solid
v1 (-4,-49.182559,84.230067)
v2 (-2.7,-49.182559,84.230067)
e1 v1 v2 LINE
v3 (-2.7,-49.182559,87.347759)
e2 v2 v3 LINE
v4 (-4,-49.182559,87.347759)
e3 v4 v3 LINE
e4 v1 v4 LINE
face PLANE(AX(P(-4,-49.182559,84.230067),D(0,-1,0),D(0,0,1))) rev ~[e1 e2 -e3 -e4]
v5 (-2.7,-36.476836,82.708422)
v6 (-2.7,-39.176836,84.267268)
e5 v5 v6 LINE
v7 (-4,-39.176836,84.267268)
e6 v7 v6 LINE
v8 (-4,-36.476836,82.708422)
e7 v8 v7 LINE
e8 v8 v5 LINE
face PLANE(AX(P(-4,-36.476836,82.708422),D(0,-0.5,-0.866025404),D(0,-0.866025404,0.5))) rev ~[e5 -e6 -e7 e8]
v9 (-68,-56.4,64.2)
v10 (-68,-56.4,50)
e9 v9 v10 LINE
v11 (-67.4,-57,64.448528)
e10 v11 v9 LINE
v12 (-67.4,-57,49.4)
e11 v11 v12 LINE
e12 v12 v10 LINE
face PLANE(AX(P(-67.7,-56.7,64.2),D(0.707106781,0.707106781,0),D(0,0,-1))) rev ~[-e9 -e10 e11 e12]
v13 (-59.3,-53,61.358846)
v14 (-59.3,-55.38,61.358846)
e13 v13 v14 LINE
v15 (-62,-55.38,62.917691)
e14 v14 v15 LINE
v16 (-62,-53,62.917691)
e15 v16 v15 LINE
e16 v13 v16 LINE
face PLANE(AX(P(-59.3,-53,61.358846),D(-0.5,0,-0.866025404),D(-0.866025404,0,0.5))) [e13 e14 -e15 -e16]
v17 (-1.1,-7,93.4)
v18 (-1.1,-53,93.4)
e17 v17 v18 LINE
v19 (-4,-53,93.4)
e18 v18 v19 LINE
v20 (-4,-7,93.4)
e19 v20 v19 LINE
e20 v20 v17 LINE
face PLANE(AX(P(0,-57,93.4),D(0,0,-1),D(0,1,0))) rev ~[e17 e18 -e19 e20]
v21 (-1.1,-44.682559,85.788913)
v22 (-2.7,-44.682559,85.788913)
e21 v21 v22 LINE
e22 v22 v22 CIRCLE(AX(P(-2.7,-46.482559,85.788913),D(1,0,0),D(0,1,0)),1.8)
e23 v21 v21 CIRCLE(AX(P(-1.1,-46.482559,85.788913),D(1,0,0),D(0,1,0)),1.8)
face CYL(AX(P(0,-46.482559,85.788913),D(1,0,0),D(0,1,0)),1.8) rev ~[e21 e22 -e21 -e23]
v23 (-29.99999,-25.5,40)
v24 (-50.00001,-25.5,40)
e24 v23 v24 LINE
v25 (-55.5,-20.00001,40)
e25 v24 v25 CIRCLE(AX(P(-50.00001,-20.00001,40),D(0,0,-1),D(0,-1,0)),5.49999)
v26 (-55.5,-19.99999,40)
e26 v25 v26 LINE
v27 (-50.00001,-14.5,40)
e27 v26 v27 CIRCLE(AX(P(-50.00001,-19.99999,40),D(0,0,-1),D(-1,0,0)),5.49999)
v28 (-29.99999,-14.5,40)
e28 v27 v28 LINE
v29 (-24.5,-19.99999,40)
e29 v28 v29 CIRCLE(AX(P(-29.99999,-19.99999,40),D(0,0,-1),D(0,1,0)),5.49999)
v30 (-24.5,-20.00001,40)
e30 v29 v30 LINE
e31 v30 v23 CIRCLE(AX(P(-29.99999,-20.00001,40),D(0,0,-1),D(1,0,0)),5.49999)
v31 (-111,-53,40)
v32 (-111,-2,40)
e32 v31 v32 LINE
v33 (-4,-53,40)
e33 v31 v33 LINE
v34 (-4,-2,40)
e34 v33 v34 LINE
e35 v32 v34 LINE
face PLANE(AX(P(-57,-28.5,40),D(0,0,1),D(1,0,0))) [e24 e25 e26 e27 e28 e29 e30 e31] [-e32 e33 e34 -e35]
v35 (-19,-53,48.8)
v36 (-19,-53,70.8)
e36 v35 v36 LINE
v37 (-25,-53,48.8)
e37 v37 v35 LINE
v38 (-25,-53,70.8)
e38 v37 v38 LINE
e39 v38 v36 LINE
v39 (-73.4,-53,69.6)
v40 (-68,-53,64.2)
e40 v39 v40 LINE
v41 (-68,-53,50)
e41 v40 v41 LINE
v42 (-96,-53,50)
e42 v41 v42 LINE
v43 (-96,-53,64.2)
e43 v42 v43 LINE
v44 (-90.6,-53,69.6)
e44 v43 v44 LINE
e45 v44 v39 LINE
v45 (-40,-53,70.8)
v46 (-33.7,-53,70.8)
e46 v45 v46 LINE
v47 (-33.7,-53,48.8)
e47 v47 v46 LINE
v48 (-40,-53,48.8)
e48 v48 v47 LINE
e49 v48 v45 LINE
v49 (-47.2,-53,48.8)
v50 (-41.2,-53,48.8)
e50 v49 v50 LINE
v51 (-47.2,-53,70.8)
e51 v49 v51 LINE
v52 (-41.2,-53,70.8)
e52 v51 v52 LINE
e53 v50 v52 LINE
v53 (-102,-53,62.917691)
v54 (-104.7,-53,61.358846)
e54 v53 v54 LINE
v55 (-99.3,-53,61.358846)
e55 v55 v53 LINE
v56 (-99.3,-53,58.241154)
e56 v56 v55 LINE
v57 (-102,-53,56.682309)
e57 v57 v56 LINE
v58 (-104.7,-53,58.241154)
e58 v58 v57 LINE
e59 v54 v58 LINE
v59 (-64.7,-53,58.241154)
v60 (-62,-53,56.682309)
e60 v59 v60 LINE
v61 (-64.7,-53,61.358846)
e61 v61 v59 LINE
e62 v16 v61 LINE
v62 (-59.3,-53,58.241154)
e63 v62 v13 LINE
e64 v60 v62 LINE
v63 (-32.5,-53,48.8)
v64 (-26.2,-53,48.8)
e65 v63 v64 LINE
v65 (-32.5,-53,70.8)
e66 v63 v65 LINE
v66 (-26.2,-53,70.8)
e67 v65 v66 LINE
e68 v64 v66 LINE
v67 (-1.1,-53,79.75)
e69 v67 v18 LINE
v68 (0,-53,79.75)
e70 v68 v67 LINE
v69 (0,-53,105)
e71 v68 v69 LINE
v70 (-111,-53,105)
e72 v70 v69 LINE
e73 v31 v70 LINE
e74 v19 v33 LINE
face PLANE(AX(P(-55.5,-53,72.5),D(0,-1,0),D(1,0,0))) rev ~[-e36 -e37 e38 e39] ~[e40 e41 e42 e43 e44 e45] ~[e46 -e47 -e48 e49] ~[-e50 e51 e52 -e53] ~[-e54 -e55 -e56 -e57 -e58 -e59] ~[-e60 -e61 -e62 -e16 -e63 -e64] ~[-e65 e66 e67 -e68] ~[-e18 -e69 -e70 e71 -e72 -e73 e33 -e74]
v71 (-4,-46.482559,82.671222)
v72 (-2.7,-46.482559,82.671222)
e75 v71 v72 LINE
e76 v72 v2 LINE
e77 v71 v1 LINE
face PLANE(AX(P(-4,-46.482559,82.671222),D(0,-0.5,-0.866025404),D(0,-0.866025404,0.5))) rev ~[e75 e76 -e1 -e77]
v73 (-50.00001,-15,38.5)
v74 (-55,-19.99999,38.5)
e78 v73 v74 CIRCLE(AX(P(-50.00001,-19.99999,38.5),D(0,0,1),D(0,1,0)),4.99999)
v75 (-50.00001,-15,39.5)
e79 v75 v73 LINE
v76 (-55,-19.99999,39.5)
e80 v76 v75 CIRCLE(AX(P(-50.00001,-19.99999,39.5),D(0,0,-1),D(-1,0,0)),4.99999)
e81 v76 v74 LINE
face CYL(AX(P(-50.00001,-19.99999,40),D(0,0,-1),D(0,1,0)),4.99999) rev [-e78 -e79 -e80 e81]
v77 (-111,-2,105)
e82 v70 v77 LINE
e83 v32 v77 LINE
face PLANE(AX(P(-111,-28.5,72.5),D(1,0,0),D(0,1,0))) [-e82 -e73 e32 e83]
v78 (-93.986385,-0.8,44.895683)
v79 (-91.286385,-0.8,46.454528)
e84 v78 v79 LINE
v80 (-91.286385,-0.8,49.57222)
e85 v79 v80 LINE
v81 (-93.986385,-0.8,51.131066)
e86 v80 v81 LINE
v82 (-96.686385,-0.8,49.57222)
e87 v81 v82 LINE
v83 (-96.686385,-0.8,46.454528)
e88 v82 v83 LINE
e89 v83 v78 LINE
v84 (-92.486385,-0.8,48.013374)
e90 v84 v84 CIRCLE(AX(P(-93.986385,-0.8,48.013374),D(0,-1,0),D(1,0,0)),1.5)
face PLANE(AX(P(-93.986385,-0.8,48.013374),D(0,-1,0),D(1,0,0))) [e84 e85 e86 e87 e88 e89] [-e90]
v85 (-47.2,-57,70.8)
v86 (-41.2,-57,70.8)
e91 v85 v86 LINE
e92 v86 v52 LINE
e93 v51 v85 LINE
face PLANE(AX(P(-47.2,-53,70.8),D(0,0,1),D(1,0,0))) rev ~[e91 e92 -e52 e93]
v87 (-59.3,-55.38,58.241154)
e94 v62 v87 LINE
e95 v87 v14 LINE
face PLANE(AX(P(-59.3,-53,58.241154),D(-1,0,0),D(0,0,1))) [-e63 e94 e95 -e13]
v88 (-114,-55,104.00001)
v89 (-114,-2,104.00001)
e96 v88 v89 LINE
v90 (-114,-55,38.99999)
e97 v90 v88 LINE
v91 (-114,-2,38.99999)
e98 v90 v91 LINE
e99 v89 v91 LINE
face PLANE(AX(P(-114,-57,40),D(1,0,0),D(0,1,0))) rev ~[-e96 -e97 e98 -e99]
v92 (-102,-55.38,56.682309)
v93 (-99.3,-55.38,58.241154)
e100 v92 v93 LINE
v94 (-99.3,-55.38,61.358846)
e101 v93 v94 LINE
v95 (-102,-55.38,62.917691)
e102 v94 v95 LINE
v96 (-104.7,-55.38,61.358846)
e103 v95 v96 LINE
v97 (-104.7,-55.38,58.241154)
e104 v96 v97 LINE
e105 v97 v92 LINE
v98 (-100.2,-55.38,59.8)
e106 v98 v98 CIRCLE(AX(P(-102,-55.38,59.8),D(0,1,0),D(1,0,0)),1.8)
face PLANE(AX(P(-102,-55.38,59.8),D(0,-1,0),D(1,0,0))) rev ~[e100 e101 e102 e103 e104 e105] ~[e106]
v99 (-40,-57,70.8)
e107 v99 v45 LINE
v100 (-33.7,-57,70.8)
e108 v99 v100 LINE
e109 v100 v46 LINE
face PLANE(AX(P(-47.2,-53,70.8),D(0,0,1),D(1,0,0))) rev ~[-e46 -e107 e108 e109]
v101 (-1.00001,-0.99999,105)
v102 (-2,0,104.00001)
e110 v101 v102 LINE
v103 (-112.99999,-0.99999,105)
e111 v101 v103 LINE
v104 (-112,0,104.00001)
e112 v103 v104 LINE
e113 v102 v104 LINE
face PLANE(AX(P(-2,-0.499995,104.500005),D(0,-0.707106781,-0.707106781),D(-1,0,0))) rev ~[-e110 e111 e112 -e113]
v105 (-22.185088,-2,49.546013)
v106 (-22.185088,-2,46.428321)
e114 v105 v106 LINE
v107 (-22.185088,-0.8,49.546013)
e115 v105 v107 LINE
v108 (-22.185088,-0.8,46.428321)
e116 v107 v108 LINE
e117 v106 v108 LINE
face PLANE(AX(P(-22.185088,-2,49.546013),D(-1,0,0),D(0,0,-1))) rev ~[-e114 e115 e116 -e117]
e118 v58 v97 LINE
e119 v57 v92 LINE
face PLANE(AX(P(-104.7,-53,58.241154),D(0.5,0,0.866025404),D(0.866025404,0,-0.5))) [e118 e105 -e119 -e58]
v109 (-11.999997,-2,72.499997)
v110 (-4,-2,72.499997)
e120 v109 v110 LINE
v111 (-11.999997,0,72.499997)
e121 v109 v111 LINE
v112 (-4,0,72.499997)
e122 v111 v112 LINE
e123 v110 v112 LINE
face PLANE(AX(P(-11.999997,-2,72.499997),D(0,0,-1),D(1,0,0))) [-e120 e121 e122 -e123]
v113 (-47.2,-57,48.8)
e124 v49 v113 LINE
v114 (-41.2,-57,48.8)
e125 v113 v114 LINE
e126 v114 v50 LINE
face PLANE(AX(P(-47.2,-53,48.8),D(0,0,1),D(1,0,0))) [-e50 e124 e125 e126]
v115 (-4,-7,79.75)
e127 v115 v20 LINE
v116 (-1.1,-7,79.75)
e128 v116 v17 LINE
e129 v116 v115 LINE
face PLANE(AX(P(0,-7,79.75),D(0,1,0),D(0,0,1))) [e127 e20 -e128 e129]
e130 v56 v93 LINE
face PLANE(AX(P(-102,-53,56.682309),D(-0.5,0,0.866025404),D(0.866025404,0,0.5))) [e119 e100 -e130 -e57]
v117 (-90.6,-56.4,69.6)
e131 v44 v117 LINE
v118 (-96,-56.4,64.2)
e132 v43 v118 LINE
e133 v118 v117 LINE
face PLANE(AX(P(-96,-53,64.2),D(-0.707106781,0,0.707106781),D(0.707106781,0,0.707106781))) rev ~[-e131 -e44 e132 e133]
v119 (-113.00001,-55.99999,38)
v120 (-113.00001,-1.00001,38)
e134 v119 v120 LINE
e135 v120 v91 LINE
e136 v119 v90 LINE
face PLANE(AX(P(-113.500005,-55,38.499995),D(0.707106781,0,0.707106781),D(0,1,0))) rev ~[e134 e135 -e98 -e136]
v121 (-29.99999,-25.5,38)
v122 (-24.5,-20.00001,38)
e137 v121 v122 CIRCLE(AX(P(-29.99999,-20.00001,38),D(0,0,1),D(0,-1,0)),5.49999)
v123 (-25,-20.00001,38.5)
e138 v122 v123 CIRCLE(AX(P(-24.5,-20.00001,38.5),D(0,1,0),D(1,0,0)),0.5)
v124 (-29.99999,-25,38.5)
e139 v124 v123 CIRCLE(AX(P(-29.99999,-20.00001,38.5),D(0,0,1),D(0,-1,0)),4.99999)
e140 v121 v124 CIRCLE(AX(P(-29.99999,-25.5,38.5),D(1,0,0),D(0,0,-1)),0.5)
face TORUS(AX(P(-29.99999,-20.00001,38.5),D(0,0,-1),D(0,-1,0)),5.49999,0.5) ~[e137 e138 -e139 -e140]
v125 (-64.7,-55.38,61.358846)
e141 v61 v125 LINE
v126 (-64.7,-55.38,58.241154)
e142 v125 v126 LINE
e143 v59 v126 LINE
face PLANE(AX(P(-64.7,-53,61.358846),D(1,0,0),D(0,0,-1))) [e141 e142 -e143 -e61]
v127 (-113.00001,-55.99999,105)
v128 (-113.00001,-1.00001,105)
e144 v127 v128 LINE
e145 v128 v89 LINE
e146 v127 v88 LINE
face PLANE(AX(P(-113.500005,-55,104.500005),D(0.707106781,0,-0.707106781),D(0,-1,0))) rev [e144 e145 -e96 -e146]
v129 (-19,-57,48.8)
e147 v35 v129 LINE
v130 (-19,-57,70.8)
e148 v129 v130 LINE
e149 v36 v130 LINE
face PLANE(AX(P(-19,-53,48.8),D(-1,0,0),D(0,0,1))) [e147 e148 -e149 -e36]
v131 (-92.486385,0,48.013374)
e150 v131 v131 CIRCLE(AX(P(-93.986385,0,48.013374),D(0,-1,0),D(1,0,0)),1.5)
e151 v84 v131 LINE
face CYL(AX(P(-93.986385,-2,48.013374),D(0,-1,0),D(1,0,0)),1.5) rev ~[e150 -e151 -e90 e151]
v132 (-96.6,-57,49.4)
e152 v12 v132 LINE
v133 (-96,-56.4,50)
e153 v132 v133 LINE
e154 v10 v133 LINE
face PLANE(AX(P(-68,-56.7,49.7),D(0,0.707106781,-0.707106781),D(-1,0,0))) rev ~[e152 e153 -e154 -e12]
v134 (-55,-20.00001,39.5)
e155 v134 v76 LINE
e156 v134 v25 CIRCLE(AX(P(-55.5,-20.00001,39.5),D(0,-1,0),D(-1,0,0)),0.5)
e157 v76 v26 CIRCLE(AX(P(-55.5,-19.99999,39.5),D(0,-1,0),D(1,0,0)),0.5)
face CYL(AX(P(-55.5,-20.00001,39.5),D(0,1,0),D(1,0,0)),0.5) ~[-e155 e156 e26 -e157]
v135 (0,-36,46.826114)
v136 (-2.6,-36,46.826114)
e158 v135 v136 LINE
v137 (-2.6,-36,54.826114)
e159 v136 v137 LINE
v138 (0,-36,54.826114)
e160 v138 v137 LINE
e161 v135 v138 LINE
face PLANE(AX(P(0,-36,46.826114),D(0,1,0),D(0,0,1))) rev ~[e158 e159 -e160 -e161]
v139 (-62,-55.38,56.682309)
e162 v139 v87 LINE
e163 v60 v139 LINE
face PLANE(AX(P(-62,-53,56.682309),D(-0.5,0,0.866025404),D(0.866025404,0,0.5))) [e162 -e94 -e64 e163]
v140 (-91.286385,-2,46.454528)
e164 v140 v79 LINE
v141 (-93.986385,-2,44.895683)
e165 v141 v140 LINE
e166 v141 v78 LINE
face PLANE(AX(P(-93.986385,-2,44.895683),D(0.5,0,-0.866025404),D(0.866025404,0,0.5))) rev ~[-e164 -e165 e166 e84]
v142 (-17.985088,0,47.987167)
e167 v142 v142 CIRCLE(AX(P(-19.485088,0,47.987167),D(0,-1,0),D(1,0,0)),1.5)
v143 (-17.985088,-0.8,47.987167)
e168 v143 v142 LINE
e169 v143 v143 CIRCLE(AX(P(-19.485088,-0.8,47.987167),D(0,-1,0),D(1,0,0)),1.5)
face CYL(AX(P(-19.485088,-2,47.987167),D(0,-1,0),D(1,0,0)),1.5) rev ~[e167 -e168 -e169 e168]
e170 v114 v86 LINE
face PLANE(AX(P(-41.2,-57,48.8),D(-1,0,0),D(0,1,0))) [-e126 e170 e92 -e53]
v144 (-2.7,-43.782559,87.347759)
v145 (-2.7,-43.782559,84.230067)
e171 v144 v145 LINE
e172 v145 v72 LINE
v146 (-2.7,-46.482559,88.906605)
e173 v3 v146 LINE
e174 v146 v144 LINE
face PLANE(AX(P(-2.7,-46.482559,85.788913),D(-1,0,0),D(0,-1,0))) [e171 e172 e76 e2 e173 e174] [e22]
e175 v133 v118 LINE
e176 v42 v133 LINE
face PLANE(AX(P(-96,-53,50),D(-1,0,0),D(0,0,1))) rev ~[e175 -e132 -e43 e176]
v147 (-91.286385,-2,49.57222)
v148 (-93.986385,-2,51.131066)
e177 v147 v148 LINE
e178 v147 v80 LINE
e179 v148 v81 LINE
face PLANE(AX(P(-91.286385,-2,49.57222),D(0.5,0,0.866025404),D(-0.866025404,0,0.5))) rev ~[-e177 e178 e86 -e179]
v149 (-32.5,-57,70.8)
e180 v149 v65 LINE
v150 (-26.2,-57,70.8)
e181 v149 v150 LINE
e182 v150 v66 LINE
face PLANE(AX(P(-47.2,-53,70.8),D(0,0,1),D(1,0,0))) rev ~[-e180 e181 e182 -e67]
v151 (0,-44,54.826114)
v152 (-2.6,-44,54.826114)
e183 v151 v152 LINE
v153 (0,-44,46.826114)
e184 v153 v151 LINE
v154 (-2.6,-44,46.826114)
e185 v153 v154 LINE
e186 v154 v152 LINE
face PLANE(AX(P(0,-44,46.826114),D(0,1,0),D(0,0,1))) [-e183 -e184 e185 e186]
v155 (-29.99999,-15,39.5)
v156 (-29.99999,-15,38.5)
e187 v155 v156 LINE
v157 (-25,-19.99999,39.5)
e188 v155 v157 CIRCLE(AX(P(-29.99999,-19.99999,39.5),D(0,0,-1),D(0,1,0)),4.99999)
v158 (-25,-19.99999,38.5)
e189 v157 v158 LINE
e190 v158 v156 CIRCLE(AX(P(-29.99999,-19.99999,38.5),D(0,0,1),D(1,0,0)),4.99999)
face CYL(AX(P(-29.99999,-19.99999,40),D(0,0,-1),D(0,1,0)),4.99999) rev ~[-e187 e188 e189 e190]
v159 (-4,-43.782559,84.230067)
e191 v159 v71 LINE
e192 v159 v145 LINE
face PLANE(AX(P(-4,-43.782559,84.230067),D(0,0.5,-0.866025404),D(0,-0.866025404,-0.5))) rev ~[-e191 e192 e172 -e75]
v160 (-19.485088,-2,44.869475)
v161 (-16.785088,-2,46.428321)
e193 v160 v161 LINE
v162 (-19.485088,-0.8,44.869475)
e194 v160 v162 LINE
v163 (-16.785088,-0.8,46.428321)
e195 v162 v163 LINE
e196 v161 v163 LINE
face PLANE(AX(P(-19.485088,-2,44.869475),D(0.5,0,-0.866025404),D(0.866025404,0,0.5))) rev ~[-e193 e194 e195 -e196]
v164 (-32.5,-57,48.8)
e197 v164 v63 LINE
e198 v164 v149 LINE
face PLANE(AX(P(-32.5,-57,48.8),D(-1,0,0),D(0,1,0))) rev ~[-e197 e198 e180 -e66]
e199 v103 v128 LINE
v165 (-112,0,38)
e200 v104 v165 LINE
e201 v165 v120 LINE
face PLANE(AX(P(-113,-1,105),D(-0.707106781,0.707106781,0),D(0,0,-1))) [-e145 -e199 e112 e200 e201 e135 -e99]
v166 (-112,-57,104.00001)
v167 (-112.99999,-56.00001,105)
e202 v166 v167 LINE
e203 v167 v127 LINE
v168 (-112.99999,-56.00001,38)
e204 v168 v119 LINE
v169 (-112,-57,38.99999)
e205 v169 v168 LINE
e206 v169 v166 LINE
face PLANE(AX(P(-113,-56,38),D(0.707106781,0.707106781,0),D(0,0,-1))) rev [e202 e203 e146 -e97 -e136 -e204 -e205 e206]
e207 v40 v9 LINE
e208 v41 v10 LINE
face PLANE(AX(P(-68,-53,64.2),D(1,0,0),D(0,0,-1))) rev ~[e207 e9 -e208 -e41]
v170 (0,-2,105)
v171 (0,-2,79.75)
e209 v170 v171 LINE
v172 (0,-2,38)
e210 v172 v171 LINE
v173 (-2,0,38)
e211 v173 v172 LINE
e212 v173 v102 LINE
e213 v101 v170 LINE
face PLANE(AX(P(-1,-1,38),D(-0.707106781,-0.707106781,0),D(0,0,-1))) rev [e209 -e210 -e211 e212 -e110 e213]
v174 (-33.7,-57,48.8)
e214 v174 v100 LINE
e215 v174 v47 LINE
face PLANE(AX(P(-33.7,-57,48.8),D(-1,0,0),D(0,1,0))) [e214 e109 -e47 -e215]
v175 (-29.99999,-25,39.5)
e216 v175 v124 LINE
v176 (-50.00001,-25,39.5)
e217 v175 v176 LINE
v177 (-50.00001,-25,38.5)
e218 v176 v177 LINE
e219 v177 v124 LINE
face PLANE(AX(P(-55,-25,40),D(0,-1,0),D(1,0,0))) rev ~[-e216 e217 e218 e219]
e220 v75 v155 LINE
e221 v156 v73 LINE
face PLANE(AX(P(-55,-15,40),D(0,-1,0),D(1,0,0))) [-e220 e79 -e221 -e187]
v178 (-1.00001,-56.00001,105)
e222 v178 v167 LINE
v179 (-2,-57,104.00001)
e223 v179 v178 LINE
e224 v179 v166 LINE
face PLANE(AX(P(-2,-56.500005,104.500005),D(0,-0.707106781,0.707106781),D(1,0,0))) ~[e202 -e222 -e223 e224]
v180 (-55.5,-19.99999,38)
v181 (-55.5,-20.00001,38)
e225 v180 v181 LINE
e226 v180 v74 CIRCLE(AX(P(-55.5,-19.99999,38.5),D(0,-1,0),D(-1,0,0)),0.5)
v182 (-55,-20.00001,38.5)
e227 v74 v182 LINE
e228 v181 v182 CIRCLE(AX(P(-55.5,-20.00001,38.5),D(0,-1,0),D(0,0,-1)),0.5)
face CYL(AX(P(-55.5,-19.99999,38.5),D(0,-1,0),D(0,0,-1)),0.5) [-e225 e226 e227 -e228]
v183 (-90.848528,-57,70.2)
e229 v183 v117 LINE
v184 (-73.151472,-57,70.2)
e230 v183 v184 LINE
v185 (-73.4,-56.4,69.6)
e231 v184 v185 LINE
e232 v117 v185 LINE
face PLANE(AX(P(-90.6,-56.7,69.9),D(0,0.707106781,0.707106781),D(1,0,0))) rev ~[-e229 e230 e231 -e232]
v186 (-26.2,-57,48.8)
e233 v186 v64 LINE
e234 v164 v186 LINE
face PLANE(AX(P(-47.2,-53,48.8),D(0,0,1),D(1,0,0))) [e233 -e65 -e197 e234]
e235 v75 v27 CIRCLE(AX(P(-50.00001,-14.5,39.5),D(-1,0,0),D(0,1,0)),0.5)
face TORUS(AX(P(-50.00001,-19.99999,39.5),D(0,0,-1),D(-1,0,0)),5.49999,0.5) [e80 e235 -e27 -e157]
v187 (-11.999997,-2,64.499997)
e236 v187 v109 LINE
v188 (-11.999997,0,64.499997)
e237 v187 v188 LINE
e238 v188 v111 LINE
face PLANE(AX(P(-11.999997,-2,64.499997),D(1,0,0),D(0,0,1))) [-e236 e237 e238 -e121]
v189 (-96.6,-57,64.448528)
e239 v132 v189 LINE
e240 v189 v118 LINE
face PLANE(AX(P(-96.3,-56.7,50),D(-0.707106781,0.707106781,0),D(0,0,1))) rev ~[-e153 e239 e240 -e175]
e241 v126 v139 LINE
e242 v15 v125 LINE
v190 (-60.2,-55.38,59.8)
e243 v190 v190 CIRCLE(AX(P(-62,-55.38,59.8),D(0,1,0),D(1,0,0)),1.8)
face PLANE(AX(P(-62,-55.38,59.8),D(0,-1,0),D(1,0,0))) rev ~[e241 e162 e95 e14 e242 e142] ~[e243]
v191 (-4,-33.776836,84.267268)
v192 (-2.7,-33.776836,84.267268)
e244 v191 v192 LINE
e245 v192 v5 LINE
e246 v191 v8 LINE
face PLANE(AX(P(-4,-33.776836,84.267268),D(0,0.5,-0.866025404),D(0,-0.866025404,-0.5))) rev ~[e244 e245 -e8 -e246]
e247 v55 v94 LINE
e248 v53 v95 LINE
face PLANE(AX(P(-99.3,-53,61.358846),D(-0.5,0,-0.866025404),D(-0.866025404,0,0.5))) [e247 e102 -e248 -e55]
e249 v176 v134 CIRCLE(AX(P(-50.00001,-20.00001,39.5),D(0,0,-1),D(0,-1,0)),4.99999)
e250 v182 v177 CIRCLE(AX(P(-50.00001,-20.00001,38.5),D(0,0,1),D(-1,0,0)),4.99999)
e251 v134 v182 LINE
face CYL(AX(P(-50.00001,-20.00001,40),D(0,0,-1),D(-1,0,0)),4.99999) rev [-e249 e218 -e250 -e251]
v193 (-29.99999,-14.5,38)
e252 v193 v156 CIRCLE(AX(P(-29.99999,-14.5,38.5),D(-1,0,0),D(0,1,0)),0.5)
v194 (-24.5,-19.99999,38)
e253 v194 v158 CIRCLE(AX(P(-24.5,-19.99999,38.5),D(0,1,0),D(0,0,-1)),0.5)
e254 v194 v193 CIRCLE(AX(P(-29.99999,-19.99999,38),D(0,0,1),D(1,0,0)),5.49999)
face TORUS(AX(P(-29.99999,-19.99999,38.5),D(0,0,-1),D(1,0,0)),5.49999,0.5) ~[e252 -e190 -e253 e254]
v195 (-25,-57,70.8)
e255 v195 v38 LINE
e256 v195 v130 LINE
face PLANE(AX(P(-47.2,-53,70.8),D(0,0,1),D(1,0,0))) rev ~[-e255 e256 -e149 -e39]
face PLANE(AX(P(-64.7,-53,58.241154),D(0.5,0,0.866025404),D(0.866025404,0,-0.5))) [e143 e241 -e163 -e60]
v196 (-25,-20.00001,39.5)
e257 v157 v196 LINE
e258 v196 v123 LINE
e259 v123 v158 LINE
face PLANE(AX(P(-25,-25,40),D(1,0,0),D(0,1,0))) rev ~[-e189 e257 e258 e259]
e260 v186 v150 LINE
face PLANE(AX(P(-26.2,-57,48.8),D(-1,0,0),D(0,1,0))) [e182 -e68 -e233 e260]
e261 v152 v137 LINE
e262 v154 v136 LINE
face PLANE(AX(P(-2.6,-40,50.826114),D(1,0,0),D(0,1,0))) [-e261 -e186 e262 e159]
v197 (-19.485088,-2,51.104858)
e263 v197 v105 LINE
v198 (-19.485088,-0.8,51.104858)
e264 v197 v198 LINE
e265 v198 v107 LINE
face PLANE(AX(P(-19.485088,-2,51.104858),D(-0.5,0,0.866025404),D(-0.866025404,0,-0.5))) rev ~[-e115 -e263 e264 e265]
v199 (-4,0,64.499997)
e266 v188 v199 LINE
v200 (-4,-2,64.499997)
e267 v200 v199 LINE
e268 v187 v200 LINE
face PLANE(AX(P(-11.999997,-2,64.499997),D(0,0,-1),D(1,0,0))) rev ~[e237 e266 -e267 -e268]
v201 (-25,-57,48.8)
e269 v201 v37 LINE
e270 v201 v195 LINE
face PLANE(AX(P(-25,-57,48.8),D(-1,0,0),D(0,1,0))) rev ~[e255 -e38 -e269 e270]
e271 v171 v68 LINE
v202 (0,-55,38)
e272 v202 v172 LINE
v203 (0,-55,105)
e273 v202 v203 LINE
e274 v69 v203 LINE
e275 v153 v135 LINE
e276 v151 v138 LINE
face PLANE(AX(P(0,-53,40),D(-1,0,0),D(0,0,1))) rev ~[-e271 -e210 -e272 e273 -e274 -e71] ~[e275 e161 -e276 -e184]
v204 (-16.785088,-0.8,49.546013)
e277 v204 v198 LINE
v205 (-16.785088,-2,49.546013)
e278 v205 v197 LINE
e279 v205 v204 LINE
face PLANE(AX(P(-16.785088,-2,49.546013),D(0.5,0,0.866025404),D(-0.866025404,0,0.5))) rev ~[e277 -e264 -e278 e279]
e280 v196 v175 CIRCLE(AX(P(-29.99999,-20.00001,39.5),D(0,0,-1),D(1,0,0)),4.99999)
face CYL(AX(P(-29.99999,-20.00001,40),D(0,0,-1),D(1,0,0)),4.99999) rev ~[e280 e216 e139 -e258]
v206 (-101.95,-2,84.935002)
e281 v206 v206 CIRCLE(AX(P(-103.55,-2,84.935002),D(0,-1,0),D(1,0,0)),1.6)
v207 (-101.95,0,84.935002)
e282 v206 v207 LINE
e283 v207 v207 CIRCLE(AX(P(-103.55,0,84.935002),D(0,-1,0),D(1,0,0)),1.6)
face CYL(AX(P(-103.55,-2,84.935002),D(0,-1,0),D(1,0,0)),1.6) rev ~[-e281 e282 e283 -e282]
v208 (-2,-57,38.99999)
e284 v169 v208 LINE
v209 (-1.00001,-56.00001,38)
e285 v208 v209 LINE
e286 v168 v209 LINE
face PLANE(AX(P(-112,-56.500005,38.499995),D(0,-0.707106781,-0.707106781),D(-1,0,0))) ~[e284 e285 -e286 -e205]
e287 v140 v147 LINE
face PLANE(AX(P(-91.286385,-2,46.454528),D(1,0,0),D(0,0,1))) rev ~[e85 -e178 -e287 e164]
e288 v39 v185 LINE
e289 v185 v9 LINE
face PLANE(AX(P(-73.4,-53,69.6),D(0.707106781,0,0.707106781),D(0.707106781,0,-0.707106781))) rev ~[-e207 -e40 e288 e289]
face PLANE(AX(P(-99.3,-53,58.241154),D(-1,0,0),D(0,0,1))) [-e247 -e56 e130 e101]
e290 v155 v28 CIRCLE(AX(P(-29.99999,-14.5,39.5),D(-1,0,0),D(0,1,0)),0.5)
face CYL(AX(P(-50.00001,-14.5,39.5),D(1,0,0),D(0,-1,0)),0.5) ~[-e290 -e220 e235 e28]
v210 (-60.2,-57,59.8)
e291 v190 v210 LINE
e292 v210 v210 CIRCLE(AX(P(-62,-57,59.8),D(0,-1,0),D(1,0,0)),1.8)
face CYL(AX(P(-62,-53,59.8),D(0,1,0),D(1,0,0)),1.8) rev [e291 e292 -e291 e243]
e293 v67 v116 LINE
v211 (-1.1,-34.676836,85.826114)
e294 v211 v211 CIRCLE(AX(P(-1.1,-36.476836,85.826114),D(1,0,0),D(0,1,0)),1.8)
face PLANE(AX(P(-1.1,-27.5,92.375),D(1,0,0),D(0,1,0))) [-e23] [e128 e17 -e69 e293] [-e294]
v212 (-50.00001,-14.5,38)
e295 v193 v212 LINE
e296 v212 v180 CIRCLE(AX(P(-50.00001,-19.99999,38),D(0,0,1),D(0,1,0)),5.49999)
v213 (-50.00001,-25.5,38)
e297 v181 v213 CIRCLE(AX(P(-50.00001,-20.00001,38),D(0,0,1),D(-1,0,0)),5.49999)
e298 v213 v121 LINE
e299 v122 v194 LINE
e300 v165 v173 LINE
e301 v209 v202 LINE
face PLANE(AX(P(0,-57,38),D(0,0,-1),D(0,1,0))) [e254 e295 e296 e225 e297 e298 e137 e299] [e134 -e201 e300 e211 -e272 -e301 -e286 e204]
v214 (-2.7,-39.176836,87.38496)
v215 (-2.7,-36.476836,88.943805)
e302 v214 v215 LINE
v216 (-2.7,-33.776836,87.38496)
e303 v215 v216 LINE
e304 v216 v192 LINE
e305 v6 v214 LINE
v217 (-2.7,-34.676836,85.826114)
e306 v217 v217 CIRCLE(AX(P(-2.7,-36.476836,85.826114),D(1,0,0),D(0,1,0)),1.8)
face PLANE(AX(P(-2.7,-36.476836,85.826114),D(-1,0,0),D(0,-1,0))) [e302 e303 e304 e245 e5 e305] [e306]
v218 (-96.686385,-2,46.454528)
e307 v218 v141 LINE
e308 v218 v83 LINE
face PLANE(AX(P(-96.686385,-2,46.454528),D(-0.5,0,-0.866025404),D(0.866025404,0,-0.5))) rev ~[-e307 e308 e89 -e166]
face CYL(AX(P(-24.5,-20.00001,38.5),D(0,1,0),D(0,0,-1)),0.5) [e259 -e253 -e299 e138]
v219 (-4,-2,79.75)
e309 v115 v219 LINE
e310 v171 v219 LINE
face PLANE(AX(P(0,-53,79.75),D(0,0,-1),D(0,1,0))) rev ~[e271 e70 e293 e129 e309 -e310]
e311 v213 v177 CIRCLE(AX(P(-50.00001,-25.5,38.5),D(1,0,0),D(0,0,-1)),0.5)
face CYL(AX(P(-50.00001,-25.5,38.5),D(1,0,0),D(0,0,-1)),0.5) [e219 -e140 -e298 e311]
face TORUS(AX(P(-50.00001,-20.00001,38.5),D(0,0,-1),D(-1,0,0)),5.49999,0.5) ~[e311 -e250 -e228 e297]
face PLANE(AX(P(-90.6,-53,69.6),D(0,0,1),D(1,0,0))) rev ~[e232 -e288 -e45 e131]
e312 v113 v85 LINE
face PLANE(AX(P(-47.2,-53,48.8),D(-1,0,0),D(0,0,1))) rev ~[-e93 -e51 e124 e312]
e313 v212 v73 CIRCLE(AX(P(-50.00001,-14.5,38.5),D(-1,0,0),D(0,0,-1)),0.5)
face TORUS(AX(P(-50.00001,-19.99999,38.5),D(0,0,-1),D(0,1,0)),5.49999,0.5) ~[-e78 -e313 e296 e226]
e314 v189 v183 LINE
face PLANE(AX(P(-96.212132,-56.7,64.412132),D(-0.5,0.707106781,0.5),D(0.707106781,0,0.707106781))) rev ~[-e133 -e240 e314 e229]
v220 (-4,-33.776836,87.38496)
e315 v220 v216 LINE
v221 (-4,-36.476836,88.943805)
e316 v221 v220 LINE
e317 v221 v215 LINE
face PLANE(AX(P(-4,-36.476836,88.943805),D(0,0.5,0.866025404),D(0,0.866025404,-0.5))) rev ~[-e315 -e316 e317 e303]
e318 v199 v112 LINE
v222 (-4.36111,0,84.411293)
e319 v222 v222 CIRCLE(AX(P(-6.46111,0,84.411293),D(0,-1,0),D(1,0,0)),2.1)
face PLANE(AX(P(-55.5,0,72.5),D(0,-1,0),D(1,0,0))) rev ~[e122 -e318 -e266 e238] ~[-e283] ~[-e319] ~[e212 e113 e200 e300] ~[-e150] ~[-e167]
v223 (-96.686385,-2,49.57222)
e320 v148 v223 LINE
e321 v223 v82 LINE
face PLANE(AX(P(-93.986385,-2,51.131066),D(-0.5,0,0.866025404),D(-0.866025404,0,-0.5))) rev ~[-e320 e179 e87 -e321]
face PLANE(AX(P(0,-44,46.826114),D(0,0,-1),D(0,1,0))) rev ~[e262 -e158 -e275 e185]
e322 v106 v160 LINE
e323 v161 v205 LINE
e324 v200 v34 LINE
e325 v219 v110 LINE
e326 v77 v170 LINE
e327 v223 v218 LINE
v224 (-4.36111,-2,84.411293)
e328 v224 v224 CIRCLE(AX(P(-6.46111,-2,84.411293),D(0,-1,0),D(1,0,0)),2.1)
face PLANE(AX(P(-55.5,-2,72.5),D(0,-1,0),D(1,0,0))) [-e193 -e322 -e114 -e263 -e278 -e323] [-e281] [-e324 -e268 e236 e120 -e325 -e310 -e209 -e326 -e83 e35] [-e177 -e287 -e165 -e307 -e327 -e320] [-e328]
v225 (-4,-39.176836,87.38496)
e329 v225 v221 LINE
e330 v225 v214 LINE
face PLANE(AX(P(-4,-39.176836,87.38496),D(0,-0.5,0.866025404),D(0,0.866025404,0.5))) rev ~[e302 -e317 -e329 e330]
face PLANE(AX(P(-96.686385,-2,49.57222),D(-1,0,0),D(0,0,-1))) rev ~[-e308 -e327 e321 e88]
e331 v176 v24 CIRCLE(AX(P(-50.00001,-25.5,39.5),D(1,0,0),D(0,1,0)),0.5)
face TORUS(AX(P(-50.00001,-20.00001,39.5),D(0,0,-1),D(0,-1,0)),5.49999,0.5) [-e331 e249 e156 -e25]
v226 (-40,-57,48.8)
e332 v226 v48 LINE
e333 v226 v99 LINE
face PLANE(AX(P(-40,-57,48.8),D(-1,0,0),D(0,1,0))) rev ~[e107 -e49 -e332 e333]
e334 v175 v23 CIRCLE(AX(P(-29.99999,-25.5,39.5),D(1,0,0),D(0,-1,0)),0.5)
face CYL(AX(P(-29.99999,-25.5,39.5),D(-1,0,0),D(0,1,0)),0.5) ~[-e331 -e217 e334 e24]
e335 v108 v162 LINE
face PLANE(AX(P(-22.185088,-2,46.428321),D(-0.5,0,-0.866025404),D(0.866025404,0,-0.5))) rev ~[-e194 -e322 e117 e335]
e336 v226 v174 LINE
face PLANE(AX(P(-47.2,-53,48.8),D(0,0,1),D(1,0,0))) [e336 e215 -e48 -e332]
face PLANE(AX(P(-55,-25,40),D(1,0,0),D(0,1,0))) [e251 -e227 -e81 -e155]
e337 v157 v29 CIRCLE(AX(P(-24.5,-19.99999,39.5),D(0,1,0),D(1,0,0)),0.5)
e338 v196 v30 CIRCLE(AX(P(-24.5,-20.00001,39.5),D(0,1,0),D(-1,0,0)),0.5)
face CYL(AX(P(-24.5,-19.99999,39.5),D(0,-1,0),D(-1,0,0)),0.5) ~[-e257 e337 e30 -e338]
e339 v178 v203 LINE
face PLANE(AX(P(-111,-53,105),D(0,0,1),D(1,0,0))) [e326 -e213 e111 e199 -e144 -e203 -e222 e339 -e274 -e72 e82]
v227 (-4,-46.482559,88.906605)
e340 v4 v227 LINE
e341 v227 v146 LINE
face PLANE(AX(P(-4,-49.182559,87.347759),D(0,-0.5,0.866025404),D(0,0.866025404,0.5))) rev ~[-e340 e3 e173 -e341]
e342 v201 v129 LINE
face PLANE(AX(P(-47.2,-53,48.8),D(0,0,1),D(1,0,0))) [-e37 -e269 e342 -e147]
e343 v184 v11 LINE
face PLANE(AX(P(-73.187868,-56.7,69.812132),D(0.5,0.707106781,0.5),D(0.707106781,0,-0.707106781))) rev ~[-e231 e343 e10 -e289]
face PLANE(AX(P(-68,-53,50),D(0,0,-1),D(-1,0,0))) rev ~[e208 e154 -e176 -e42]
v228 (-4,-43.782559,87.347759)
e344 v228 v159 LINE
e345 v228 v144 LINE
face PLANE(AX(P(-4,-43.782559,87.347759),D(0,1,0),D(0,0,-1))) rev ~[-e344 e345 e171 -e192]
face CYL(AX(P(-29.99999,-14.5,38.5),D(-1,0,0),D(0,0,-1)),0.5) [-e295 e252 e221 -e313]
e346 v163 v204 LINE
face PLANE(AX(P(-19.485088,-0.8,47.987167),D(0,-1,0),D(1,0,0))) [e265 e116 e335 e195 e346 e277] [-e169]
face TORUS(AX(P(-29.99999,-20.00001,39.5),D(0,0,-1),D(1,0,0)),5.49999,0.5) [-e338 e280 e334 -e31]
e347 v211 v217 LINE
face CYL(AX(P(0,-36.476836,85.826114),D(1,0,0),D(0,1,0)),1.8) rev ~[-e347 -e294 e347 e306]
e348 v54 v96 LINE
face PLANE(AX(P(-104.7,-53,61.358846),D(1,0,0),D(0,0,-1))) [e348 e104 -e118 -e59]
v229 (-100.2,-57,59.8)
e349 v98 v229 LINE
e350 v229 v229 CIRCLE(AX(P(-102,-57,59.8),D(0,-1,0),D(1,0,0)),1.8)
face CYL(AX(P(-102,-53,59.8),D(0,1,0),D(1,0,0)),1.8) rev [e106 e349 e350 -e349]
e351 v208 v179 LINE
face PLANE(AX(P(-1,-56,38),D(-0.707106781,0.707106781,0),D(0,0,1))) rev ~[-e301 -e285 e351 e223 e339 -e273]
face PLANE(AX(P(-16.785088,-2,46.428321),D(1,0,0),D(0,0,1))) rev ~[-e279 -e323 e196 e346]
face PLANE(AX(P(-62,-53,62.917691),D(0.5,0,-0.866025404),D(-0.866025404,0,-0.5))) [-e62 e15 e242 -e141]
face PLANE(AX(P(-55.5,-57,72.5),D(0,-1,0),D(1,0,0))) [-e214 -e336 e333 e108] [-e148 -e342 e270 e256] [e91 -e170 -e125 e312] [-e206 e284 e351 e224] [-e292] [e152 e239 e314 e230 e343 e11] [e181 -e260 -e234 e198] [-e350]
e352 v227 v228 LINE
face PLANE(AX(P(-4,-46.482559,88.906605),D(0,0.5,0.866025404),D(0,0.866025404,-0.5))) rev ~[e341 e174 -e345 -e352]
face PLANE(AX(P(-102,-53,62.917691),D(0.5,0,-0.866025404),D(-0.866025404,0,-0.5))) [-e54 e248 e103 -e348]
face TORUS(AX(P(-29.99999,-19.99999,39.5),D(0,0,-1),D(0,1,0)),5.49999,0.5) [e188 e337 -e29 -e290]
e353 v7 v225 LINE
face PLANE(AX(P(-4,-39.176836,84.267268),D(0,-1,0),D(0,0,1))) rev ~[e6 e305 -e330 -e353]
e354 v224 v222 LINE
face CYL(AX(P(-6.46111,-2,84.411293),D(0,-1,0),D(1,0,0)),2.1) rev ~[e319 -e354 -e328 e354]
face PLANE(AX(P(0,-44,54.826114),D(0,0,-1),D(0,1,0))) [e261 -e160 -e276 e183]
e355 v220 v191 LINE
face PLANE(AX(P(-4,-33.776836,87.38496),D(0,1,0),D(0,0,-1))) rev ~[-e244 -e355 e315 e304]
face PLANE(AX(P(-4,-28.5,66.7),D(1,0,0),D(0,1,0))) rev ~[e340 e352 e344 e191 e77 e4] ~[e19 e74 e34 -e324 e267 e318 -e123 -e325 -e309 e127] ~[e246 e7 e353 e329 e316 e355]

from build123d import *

# Parameters (mm, degrees)
F7_W      = 57
F7_H      = 65
F8_DEPTH  = 3
F6_W      = 114
F6_H      = 57
F6_W_2    = 30
F6_H_2    = 10
F9_DEPTH  = 2
F10_R     = 4.99999
F5_W      = 57
F5_H      = 53.4
F5_R      = 1.8
F11_DEPTH = 4
F12_W     = 51
F12_H     = 25.25
F13_DEPTH = 1.1
F14_DEPTH = 4
F15_W     = 5
F15_H     = 25.25
F16_DEPTH = 4.1
F1_W      = 111
F1_H      = 65
F1_R      = 1.5
F1_W_2    = 8
F1_H_2    = 8
F1_R_2    = 1.6
F1_R_3    = 2.1
F17_DEPTH = 2
F19_SIZE  = 2
F20_SIZE  = 2
F18_W     = 111
F18_H     = 65
F18_R     = 1.8
F18_W_2   = 28.2
F18_H_2   = 22
F21_DEPTH = 4
F22_SIZE  = 2
F23_SIZE  = 2
F24_SIZE  = 0.99999
F25_SIZE  = 0.99999
F26_R     = 0.5
F27_W     = 1.2
F27_H     = 4
F28_DEPTH = 22
F29_SIZE  = 0.6
F31_DEPTH = 1.3
F33_DEPTH = 2.38
F35_DEPTH = 1.2
F36_W     = 8
F36_H     = 8
F37_DEPTH = 2.6


# Not quite as in the source:
# - a fillet or chamfer is up to 0.001 mm smaller than in the source, because OpenCascade refuses the exact size


with BuildPart() as f8:
    # F7 (on offset) → F8 (new body)
    with BuildSketch(Plane.YZ.offset(-111)):
        with Locations((-28.5, 72.5)):
            Rectangle(F7_W, F7_H)
    extrude(amount=-F8_DEPTH)

    # F6 (on offset) → F9 (join)
    with BuildSketch(Plane.XY.offset(40)):
        with Locations((-57, -28.5)):
            Rectangle(F6_W, F6_H)
        with Locations((-40, -20)):
            Rectangle(F6_W_2, F6_H_2, mode=Mode.SUBTRACT)
    extrude(amount=-F9_DEPTH)

    # F10 (radius 5 in the source; OpenCascade refuses exactly that, so slightly less here)
    f10_edges = [f8.edges().sort_by_distance(p)[0] for p in [
        (-25, -25, 39),
        (-55, -25, 39),
        (-55, -15, 39),
        (-25, -15, 39),
    ]]
    fillet(f10_edges, radius=F10_R)

    # F5 (on Right) → F11 (join)
    with BuildSketch(Plane.YZ):
        with Locations((-28.5, 66.7)):
            Rectangle(F5_W, F5_H)
        with Locations((-46.4825592935, 85.7889130712)):
            Circle(F5_R, mode=Mode.SUBTRACT)
        with Locations((-36.4768356085, 85.8261138201)):
            Circle(F5_R, mode=Mode.SUBTRACT)
    extrude(amount=-F11_DEPTH)

    # F12 (on face) → F13 (cut)
    with BuildSketch(Plane.YZ):
        with Locations((-27.5, 92.375)):
            Rectangle(F12_W, F12_H)
    extrude(amount=-F13_DEPTH, mode=Mode.SUBTRACT)

    # F14 (add): a face of the model
    f14_faces = [f8.faces().sort_by_distance(p)[0] for p in [
        (0, -28.7827981232, 59.796589178),
    ]]
    extrude(f14_faces, amount=-F14_DEPTH)

    # F15 (on face) → F16 (cut)
    with BuildSketch(Plane.YZ):
        with Locations((-4.5, 92.375)):
            Rectangle(F15_W, F15_H)
    extrude(amount=-F16_DEPTH, mode=Mode.SUBTRACT)

    # F1 (on offset) → F17 (join)
    with BuildSketch(Plane.XZ.offset(2)):
        with Locations((-55.5, 72.5)):
            Rectangle(F1_W, F1_H)
        with Locations((-93.9863845706, 48.0133742094)):
            Circle(F1_R, mode=Mode.SUBTRACT)
        with Locations((-19.4850880653, 47.9871667922)):
            Circle(F1_R, mode=Mode.SUBTRACT)
        with Locations((-7.9999973103, 68.4999966025)):
            Rectangle(F1_W_2, F1_H_2, mode=Mode.SUBTRACT)
        with Locations((-103.55, 84.9350020289)):
            Circle(F1_R_2, mode=Mode.SUBTRACT)
        with Locations((-6.4611095004, 84.4112932682)):
            Circle(F1_R_3, mode=Mode.SUBTRACT)
    extrude(amount=-F17_DEPTH)

    # F19
    f19_edges = [f8.edges().sort_by_distance(p)[0] for p in [
        (0, 0, 71.5),
    ]]
    chamfer(f19_edges, length=F19_SIZE)

    # F20
    f20_edges = [f8.edges().sort_by_distance(p)[0] for p in [
        (-114, 0, 71.5),
    ]]
    chamfer(f20_edges, length=F20_SIZE)

    # F18 (on offset) → F21 (join)
    with BuildSketch(Plane.XZ.offset(53)):
        with Locations((-55.5, 72.5)):
            Rectangle(F18_W, F18_H)
        with Locations((-102, 59.8)):
            Circle(F18_R, mode=Mode.SUBTRACT)
        Polygon((-96, 64.2), (-90.6, 69.6), (-73.4, 69.6), (-68, 64.2), (-68, 50), (-96, 50), align=None, mode=Mode.SUBTRACT)
        with Locations((-62, 59.8)):
            Circle(F18_R, mode=Mode.SUBTRACT)
        with Locations((-33.1, 59.8)):
            Rectangle(F18_W_2, F18_H_2, mode=Mode.SUBTRACT)
    extrude(amount=F21_DEPTH)

    # F22
    f22_edges = [f8.edges().sort_by_distance(p)[0] for p in [
        (0, -57, 71.5),
    ]]
    chamfer(f22_edges, length=F22_SIZE)

    # F23
    f23_edges = [f8.edges().sort_by_distance(p)[0] for p in [
        (-114, -57, 71.5),
    ]]
    chamfer(f23_edges, length=F23_SIZE)

    # F24 (size 1 in the source; OpenCascade refuses exactly that, so slightly less here)
    f24_edges = [f8.edges().sort_by_distance(p)[0] for p in [
        (-57, -57, 105),
        (-57, 0, 105),
        (-114, -28.5, 105),
    ]]
    chamfer(f24_edges, length=F24_SIZE)

    # F25 (size 1 in the source; OpenCascade refuses exactly that, so slightly less here)
    f25_edges = [f8.edges().sort_by_distance(p)[0] for p in [
        (-57, -57, 38),
        (-114, -28.5, 38),
    ]]
    chamfer(f25_edges, length=F25_SIZE)

    # F26
    f26_edges = [f8.edges().sort_by_distance(p)[0] for p in [
        (-40, -25, 38),
        (-53.535537, -23.535537, 38),
        (-40, -15, 38),
        (-26.464463, -16.464463, 38),
        (-26.464463, -16.464463, 40),
        (-53.535537, -23.535537, 40),
    ]]
    fillet(f26_edges, radius=F26_R)

    # F27 (on face) → F28 (join, through all)
    with BuildSketch(Plane.XY.offset(48.8)):
        with Locations((-33.1, -55)):
            Rectangle(F27_W, F27_H)
        with Locations((-40.6, -55)):
            Rectangle(F27_W, F27_H)
        with Locations((-25.6, -55)):
            Rectangle(F27_W, F27_H)
    extrude(amount=F28_DEPTH)

    # F29
    f29_edges = [f8.edges().sort_by_distance(p)[0] for p in [
        (-82, -57, 50),
        (-68, -57, 57.1),
        (-70.7, -57, 66.9),
        (-82, -57, 69.6),
        (-93.3, -57, 66.9),
        (-96, -57, 57.1),
    ]]
    chamfer(f29_edges, length=F29_SIZE)

    # F30 (on face) → F31 (cut)
    with BuildSketch(Plane(origin=(-4, 0, 0), x_dir=(0, -1, 0), z_dir=(-1, 0, 0))):
        Polygon((39.1768356085, 84.2672680933), (39.1768356085, 87.3849595469), (36.4768356085, 88.9438052737), (33.7768356085, 87.3849595469), (33.7768356085, 84.2672680933), (36.4768356085, 82.7084223665), align=None)
        Polygon((49.1825592935, 84.2300673443), (49.1825592935, 87.347758798), (46.4825592935, 88.9066045248), (43.7825592935, 87.347758798), (43.7825592935, 84.2300673443), (46.4825592935, 82.6712216175), align=None)
    extrude(amount=-F31_DEPTH, mode=Mode.SUBTRACT)

    # F32 (on face) → F33 (cut)
    with BuildSketch(Plane.XZ.offset(53)):
        Polygon((-64.7, 61.3588457268), (-64.7, 58.2411542732), (-62, 56.6823085464), (-59.3, 58.2411542732), (-59.3, 61.3588457268), (-62, 62.9176914536), align=None)
        Polygon((-104.7, 61.3588457268), (-104.7, 58.2411542732), (-102, 56.6823085464), (-99.3, 58.2411542732), (-99.3, 61.3588457268), (-102, 62.9176914536), align=None)
    extrude(amount=F33_DEPTH, mode=Mode.SUBTRACT)

    # F34 (on face) → F35 (cut)
    with BuildSketch(Plane.XZ.offset(2)):
        Polygon((-91.2863845706, 46.4545284826), (-91.2863845706, 49.5722199362), (-93.9863845706, 51.131065663), (-96.6863845706, 49.5722199362), (-96.6863845706, 46.4545284826), (-93.9863845706, 44.8956827558), align=None)
        Polygon((-16.7850880653, 46.4283210653), (-16.7850880653, 49.546012519), (-19.4850880653, 51.1048582458), (-22.1850880653, 49.546012519), (-22.1850880653, 46.4283210653), (-19.4850880653, 44.8694753385), align=None)
    extrude(amount=-F35_DEPTH, mode=Mode.SUBTRACT)

    # F36 (on face) → F37 (cut)
    with BuildSketch(Plane.YZ):
        with Locations((-40, 50.8261138201)):
            Rectangle(F36_W, F36_H)
    extrude(amount=-F37_DEPTH, mode=Mode.SUBTRACT)


solid = f8.part
